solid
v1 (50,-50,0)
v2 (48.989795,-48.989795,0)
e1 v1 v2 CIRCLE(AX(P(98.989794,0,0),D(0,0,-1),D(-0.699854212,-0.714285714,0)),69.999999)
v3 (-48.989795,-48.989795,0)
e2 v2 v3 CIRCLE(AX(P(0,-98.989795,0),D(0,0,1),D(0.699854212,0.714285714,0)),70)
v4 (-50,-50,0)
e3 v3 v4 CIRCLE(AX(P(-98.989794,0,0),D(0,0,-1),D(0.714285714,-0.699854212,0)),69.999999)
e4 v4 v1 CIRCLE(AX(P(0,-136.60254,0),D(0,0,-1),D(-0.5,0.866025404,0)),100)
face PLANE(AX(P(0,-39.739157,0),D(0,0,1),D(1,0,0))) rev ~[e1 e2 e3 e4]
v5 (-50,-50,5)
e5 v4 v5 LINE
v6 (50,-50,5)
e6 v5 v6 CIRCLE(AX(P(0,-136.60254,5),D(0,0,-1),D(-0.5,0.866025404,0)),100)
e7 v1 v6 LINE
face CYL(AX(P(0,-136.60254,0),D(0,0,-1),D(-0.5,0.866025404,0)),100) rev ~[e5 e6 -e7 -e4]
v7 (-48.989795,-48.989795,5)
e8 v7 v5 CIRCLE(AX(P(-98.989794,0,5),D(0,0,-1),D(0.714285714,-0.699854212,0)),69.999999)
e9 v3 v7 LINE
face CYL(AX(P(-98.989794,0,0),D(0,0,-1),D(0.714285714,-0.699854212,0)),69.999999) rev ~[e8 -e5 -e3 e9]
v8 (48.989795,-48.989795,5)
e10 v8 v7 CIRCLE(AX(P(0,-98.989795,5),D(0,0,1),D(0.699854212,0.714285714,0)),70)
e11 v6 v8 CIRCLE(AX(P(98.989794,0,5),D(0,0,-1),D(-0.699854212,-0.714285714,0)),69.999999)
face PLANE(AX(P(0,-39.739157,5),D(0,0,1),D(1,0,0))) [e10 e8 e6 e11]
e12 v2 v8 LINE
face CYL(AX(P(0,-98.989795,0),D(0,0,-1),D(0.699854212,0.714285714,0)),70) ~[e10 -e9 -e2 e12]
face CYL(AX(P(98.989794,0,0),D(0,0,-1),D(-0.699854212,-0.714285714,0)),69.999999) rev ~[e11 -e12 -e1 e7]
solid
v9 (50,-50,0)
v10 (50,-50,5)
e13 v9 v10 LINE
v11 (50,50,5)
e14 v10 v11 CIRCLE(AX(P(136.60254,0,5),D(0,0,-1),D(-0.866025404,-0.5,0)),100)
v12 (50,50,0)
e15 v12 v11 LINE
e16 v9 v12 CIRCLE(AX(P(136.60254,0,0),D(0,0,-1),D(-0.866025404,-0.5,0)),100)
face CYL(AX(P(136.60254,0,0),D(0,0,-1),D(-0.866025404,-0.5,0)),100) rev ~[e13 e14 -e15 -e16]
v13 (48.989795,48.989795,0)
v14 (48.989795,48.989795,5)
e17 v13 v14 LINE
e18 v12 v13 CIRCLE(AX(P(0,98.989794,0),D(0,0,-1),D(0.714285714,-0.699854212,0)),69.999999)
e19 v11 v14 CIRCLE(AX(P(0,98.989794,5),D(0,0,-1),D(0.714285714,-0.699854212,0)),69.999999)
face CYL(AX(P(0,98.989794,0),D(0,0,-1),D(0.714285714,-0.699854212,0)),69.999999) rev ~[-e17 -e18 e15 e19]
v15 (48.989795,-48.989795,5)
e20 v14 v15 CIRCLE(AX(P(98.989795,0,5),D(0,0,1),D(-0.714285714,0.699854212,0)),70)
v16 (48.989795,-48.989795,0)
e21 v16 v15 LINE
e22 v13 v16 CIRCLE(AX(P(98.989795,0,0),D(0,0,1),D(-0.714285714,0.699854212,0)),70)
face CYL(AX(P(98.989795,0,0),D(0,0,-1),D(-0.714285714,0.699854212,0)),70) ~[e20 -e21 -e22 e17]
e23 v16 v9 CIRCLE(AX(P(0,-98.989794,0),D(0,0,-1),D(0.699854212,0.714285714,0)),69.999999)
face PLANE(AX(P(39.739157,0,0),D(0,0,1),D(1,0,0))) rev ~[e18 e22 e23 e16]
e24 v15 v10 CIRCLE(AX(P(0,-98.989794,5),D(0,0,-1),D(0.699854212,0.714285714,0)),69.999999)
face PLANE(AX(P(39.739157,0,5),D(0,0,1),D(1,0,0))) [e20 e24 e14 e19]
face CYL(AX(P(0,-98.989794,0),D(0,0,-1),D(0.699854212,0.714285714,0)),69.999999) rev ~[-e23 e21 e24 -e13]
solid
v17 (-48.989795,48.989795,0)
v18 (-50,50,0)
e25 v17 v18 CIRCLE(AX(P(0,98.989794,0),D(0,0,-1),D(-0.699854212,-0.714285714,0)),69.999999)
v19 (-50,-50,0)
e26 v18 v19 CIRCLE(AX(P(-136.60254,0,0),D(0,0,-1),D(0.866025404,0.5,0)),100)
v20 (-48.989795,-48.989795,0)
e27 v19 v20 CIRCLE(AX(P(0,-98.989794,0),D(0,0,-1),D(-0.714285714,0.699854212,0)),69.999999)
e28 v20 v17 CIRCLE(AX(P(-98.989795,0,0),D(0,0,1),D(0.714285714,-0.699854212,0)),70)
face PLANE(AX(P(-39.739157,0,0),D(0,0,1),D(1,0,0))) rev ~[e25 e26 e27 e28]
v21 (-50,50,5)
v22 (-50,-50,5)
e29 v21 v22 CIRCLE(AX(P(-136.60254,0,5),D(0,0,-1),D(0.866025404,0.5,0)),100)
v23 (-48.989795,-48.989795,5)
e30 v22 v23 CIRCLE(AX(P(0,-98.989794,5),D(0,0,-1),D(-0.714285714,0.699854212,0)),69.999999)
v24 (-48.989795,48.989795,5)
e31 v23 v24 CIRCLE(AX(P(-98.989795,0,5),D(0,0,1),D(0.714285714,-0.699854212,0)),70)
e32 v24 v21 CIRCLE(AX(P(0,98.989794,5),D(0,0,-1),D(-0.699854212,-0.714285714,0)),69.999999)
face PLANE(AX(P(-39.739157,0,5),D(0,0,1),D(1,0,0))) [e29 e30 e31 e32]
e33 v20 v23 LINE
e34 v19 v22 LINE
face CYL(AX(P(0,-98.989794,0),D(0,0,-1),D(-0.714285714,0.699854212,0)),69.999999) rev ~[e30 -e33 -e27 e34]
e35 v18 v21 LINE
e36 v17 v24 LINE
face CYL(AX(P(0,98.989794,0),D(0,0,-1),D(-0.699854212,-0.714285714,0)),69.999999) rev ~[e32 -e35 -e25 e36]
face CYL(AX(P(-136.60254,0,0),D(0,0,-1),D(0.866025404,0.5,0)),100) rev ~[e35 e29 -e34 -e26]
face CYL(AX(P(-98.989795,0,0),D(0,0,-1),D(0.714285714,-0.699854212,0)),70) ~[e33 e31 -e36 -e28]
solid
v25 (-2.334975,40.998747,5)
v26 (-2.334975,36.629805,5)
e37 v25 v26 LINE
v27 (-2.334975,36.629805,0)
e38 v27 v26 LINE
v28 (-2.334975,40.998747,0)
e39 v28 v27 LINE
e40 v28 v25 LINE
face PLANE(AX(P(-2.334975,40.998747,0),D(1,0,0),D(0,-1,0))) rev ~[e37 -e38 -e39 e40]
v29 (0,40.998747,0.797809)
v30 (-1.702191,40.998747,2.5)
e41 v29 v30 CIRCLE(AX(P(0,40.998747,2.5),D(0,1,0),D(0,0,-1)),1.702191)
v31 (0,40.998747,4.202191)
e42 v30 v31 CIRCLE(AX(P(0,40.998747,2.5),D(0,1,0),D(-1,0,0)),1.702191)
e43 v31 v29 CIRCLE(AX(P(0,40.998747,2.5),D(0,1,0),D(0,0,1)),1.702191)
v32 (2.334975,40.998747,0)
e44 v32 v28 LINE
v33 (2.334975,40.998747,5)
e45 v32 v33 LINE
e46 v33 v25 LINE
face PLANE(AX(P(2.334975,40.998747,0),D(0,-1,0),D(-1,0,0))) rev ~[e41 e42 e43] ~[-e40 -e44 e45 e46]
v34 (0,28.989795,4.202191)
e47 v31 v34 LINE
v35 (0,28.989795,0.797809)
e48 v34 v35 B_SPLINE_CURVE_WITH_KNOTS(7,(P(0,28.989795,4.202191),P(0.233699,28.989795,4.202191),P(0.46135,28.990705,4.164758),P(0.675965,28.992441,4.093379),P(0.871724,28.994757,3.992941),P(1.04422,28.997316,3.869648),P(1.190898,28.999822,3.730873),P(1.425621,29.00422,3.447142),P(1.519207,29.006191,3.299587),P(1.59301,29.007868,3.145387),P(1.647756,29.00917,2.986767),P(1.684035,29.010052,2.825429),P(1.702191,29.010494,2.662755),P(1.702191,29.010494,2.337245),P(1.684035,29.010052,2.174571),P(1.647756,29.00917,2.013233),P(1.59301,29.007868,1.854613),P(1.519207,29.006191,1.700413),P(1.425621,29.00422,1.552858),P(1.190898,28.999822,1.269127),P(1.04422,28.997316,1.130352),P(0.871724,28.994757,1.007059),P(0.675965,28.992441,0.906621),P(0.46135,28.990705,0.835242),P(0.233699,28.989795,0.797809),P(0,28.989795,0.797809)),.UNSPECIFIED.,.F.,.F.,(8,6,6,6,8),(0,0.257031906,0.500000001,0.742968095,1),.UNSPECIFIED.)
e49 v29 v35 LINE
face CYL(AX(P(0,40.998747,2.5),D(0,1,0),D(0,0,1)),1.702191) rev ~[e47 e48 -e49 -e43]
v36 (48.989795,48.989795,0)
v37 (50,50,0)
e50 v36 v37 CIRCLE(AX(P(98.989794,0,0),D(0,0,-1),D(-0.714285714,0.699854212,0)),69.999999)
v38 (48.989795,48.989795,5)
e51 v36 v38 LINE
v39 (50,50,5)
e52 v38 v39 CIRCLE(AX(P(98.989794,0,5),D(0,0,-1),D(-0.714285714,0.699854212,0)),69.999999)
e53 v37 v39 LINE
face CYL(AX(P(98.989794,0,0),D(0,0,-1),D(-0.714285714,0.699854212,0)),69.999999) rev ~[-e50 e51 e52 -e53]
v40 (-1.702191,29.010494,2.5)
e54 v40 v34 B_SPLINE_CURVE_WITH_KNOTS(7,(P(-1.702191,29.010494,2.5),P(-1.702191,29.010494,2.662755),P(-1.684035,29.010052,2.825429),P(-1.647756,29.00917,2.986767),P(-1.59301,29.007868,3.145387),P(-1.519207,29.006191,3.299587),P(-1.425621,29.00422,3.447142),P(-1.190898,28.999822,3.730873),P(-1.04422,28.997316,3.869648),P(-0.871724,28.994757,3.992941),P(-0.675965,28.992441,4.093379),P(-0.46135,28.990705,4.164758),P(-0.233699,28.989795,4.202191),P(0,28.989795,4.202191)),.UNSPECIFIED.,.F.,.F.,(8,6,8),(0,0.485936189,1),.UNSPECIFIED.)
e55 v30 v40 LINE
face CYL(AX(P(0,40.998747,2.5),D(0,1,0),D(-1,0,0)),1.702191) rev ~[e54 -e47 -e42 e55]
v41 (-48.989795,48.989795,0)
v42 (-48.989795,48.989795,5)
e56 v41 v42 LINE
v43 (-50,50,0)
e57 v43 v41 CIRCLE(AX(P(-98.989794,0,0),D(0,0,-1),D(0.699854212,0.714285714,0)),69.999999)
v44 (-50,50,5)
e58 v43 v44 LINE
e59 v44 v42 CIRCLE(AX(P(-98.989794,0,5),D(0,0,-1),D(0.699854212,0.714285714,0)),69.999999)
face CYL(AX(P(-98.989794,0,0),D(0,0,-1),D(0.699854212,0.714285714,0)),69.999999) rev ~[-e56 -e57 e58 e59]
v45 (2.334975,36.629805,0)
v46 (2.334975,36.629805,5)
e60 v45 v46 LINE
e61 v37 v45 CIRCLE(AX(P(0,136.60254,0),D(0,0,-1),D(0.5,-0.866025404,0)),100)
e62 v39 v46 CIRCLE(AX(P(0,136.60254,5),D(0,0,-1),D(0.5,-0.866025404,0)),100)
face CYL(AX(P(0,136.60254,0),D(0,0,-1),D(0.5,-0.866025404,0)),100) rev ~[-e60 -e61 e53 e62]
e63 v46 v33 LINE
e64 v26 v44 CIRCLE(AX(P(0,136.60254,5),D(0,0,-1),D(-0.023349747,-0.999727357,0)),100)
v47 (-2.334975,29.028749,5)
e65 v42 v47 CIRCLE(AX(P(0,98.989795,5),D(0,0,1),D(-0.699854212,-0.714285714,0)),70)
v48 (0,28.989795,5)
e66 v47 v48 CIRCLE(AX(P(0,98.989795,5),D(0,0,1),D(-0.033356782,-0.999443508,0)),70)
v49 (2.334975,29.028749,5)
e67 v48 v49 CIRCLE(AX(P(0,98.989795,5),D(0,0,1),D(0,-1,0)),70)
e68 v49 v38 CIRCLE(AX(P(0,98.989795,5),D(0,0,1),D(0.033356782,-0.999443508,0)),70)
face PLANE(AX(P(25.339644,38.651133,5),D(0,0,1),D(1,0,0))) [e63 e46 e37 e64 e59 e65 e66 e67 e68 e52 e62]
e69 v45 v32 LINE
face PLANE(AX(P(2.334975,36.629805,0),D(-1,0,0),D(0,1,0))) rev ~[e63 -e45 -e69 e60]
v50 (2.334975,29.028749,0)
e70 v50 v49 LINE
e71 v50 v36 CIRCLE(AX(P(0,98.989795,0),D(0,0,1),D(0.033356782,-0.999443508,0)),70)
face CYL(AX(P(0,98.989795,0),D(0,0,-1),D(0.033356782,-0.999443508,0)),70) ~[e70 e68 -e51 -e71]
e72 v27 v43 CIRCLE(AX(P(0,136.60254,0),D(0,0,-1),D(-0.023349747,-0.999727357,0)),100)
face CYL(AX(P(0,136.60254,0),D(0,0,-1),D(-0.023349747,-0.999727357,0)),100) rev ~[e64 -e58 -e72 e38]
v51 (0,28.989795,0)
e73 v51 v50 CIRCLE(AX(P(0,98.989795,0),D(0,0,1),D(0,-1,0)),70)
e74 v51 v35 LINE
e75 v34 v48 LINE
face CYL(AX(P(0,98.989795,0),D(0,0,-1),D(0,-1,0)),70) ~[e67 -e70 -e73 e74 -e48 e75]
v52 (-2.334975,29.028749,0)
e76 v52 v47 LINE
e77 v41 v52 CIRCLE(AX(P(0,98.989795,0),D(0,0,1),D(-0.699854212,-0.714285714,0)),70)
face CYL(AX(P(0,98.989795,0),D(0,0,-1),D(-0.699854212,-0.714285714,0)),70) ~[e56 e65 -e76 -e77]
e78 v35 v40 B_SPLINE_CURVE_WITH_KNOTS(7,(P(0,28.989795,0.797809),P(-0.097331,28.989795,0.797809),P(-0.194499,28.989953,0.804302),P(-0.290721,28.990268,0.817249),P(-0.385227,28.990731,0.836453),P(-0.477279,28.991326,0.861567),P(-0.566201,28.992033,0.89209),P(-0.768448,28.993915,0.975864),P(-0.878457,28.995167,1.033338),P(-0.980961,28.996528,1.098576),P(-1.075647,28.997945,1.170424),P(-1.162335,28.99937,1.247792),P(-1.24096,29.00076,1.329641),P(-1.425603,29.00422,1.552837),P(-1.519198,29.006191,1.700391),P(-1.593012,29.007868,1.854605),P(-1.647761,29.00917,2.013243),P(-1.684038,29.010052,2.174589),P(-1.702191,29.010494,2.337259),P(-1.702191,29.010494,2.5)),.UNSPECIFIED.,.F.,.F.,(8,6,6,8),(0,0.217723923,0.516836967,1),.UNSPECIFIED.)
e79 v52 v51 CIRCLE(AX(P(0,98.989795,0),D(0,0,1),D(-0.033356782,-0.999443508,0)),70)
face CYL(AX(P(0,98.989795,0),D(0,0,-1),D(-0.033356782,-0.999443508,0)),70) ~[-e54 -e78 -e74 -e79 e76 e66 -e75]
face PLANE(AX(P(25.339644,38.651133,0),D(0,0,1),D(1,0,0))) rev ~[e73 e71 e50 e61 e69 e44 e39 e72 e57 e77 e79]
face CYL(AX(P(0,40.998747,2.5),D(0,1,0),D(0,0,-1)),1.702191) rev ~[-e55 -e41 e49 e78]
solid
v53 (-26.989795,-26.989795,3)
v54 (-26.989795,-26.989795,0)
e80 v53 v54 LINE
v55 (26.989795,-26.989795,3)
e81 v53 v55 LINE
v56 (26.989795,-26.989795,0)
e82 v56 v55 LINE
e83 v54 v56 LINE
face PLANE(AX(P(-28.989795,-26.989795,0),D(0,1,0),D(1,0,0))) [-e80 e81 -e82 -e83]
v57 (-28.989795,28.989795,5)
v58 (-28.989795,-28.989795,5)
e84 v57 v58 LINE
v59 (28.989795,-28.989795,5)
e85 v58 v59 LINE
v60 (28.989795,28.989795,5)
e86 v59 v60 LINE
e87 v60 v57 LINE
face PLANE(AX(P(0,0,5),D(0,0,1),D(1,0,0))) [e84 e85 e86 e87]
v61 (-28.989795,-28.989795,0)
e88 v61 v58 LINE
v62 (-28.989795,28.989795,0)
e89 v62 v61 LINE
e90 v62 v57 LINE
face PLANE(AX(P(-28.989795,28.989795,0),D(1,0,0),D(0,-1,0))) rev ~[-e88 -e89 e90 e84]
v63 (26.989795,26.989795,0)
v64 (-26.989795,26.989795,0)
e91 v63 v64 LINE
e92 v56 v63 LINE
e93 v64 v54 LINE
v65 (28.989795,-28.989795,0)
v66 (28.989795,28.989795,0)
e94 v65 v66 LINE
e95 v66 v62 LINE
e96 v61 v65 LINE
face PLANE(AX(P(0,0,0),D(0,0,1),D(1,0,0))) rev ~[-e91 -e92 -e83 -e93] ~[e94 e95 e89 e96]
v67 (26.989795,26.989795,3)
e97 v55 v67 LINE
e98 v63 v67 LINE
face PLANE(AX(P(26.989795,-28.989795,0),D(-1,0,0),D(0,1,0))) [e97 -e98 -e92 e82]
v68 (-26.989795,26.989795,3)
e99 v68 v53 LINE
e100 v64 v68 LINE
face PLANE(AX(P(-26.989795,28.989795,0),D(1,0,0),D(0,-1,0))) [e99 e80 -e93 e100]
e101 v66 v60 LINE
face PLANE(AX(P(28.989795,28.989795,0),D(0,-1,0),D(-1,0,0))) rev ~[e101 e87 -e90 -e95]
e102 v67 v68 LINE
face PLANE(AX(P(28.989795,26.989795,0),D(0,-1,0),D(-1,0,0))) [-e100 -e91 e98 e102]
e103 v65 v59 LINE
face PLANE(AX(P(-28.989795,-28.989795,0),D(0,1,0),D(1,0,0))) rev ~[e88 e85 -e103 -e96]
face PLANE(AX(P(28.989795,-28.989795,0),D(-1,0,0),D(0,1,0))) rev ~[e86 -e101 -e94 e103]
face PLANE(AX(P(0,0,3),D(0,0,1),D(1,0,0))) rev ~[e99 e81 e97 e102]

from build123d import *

# Parameters (mm, degrees)
F1_DEPTH = 5
F3_DEPTH = 100
F4_T     = -2


# Not quite as in the source:
# - a feature names something its author has since deleted; it is built from what else it names


with BuildPart() as f1:
    # F0 (on Top) → F1 (new body)
    with BuildSketch(Plane.XY):
        with BuildLine():
            ThreePointArc((48.9897948557, -48.9897948557), (49.4974746831, -49.4923201726), (50, -50))
            ThreePointArc((50, -50), (36.6025403784, 0), (50, 50))
            ThreePointArc((50, 50), (49.4974746831, 49.4923201726), (48.9897948557, 48.9897948557))
            ThreePointArc((48.9897948557, 48.9897948557), (34.1823878716, 26.4575131106), (28.9897948557, 0))
            ThreePointArc((28.9897948557, 0), (34.1823878716, -26.4575131106), (48.9897948557, -48.9897948557))
        make_face()
    extrude(amount=F1_DEPTH)


with BuildPart() as f1b:
    # F0 (on Top) → F1, piece 2 (new body)
    with BuildSketch(Plane.XY):
        with BuildLine():
            ThreePointArc((-50, -50), (0, -36.6025403784), (50, -50))
            ThreePointArc((50, -50), (49.4923201726, -49.4974746831), (48.9897948557, -48.9897948557))
            ThreePointArc((48.9897948557, -48.9897948557), (26.4575131106, -34.1823878716), (0, -28.9897948557))
            ThreePointArc((0, -28.9897948557), (-26.4575131106, -34.1823878716), (-48.9897948557, -48.9897948557))
            ThreePointArc((-48.9897948557, -48.9897948557), (-49.4923201726, -49.4974746831), (-50, -50))
        make_face()
    extrude(amount=F1_DEPTH)


with BuildPart() as f1c:
    # F0 (on Top) → F1, piece 3 (new body)
    with BuildSketch(Plane.XY):
        with BuildLine():
            ThreePointArc((-50, 50), (-36.6025403784, 0), (-50, -50))
            ThreePointArc((-50, -50), (-49.4974746831, -49.4923201726), (-48.9897948557, -48.9897948557))
            ThreePointArc((-48.9897948557, -48.9897948557), (-34.1823878716, -26.4575131106), (-28.9897948557, 0))
            ThreePointArc((-28.9897948557, 0), (-34.1823878716, 26.4575131106), (-48.9897948557, 48.9897948557))
            ThreePointArc((-48.9897948557, 48.9897948557), (-49.4974746831, 49.4923201726), (-50, 50))
        make_face()
    extrude(amount=F1_DEPTH)


with BuildPart() as f1d:
    # F0 (on Top) → F1, piece 4 (new body)
    with BuildSketch(Plane.XY):
        with BuildLine():
            ThreePointArc((48.9897948557, 48.9897948557), (49.4923201726, 49.4974746831), (50, 50))
            ThreePointArc((50, 50), (27.0079233825, 40.318730345), (2.3349747062, 36.6298046295))
            Line((2.3349747062, 36.6298046295), (2.3349747062, 29.0287493152))
            ThreePointArc((2.3349747062, 29.0287493152), (27.534865669, 34.6327348499), (48.9897948557, 48.9897948557))
        make_face()
        with BuildLine():
            ThreePointArc((-2.3349747062, 36.6298046295), (-27.0079233825, 40.318730345), (-50, 50))
            ThreePointArc((-50, 50), (-49.4923201726, 49.4974746831), (-48.9897948557, 48.9897948557))
            ThreePointArc((-48.9897948557, 48.9897948557), (-27.534865669, 34.6327348499), (-2.3349747062, 29.0287493152))
            Line((-2.3349747062, 29.0287493152), (-2.3349747062, 36.6298046295))
        make_face()
        with BuildLine():
            Line((2.3349747062, 29.0287493152), (2.3349747062, 36.6298046295))
            ThreePointArc((2.3349747062, 36.6298046295), (0, 36.6025403784), (-2.3349747062, 36.6298046295))
            Line((-2.3349747062, 36.6298046295), (-2.3349747062, 29.0287493152))
            ThreePointArc((-2.3349747062, 29.0287493152), (-1.1676498114, 28.9995341481), (0, 28.9897948557))
            ThreePointArc((0, 28.9897948557), (1.1676498114, 28.9995341481), (2.3349747062, 29.0287493152))
        make_face()
        with BuildLine():
            ThreePointArc((-2.3349747062, 36.6298046295), (0, 36.6025403784), (2.3349747062, 36.6298046295))
            Line((2.3349747062, 36.6298046295), (2.3349747062, 40.9987472145))
            Line((2.3349747062, 40.9987472145), (-2.3349747062, 40.9987472145))
            Line((-2.3349747062, 40.9987472145), (-2.3349747062, 36.6298046295))
        make_face()
    extrude(amount=F1_DEPTH)

    # F2 (on face) → F3 (cut)
    with BuildSketch(Plane(origin=(0, 40.9987472145, 0), x_dir=(-1, 0, 0), z_dir=(0, 1, 0))):
        with BuildLine():
            ThreePointArc((1.7021905713, 2.5), (1.2036304958, 3.7036304958), (0, 4.2021905713))
            Line((0, 4.2021905713), (0, 0.7978094287))
            ThreePointArc((0, 0.7978094287), (1.2036304958, 1.2963695042), (1.7021905713, 2.5))
        make_face()
        with BuildLine():
            Line((0, 0.7978094287), (0, 4.2021905713))
            ThreePointArc((0, 4.2021905713), (-1.7021905713, 2.5), (0, 0.7978094287))
        make_face()
    extrude(amount=-F3_DEPTH, mode=Mode.SUBTRACT)


with BuildPart() as f1e:
    # F0 (on Top) → F1, piece 5 (new body)
    with BuildSketch(Plane.XY):
        Polygon((-28.9897948557, -28.9897948557), (0, -28.9897948557), (28.9897948557, -28.9897948557), (28.9897948557, 0), (28.9897948557, 28.9897948557), (2.3349747062, 28.9897948557), (0, 28.9897948557), (-2.3349747062, 28.9897948557), (-28.9897948557, 28.9897948557), (-28.9897948557, 0), align=None)
    extrude(amount=F1_DEPTH)

    # F4
    f4_openings = [f1e.faces().sort_by_distance(p)[0] for p in [
        (0, 0, 0),
    ]]
    offset(amount=F4_T, openings=f4_openings)


solid = Compound([f1.part, f1b.part, f1c.part, f1d.part, f1e.part])
